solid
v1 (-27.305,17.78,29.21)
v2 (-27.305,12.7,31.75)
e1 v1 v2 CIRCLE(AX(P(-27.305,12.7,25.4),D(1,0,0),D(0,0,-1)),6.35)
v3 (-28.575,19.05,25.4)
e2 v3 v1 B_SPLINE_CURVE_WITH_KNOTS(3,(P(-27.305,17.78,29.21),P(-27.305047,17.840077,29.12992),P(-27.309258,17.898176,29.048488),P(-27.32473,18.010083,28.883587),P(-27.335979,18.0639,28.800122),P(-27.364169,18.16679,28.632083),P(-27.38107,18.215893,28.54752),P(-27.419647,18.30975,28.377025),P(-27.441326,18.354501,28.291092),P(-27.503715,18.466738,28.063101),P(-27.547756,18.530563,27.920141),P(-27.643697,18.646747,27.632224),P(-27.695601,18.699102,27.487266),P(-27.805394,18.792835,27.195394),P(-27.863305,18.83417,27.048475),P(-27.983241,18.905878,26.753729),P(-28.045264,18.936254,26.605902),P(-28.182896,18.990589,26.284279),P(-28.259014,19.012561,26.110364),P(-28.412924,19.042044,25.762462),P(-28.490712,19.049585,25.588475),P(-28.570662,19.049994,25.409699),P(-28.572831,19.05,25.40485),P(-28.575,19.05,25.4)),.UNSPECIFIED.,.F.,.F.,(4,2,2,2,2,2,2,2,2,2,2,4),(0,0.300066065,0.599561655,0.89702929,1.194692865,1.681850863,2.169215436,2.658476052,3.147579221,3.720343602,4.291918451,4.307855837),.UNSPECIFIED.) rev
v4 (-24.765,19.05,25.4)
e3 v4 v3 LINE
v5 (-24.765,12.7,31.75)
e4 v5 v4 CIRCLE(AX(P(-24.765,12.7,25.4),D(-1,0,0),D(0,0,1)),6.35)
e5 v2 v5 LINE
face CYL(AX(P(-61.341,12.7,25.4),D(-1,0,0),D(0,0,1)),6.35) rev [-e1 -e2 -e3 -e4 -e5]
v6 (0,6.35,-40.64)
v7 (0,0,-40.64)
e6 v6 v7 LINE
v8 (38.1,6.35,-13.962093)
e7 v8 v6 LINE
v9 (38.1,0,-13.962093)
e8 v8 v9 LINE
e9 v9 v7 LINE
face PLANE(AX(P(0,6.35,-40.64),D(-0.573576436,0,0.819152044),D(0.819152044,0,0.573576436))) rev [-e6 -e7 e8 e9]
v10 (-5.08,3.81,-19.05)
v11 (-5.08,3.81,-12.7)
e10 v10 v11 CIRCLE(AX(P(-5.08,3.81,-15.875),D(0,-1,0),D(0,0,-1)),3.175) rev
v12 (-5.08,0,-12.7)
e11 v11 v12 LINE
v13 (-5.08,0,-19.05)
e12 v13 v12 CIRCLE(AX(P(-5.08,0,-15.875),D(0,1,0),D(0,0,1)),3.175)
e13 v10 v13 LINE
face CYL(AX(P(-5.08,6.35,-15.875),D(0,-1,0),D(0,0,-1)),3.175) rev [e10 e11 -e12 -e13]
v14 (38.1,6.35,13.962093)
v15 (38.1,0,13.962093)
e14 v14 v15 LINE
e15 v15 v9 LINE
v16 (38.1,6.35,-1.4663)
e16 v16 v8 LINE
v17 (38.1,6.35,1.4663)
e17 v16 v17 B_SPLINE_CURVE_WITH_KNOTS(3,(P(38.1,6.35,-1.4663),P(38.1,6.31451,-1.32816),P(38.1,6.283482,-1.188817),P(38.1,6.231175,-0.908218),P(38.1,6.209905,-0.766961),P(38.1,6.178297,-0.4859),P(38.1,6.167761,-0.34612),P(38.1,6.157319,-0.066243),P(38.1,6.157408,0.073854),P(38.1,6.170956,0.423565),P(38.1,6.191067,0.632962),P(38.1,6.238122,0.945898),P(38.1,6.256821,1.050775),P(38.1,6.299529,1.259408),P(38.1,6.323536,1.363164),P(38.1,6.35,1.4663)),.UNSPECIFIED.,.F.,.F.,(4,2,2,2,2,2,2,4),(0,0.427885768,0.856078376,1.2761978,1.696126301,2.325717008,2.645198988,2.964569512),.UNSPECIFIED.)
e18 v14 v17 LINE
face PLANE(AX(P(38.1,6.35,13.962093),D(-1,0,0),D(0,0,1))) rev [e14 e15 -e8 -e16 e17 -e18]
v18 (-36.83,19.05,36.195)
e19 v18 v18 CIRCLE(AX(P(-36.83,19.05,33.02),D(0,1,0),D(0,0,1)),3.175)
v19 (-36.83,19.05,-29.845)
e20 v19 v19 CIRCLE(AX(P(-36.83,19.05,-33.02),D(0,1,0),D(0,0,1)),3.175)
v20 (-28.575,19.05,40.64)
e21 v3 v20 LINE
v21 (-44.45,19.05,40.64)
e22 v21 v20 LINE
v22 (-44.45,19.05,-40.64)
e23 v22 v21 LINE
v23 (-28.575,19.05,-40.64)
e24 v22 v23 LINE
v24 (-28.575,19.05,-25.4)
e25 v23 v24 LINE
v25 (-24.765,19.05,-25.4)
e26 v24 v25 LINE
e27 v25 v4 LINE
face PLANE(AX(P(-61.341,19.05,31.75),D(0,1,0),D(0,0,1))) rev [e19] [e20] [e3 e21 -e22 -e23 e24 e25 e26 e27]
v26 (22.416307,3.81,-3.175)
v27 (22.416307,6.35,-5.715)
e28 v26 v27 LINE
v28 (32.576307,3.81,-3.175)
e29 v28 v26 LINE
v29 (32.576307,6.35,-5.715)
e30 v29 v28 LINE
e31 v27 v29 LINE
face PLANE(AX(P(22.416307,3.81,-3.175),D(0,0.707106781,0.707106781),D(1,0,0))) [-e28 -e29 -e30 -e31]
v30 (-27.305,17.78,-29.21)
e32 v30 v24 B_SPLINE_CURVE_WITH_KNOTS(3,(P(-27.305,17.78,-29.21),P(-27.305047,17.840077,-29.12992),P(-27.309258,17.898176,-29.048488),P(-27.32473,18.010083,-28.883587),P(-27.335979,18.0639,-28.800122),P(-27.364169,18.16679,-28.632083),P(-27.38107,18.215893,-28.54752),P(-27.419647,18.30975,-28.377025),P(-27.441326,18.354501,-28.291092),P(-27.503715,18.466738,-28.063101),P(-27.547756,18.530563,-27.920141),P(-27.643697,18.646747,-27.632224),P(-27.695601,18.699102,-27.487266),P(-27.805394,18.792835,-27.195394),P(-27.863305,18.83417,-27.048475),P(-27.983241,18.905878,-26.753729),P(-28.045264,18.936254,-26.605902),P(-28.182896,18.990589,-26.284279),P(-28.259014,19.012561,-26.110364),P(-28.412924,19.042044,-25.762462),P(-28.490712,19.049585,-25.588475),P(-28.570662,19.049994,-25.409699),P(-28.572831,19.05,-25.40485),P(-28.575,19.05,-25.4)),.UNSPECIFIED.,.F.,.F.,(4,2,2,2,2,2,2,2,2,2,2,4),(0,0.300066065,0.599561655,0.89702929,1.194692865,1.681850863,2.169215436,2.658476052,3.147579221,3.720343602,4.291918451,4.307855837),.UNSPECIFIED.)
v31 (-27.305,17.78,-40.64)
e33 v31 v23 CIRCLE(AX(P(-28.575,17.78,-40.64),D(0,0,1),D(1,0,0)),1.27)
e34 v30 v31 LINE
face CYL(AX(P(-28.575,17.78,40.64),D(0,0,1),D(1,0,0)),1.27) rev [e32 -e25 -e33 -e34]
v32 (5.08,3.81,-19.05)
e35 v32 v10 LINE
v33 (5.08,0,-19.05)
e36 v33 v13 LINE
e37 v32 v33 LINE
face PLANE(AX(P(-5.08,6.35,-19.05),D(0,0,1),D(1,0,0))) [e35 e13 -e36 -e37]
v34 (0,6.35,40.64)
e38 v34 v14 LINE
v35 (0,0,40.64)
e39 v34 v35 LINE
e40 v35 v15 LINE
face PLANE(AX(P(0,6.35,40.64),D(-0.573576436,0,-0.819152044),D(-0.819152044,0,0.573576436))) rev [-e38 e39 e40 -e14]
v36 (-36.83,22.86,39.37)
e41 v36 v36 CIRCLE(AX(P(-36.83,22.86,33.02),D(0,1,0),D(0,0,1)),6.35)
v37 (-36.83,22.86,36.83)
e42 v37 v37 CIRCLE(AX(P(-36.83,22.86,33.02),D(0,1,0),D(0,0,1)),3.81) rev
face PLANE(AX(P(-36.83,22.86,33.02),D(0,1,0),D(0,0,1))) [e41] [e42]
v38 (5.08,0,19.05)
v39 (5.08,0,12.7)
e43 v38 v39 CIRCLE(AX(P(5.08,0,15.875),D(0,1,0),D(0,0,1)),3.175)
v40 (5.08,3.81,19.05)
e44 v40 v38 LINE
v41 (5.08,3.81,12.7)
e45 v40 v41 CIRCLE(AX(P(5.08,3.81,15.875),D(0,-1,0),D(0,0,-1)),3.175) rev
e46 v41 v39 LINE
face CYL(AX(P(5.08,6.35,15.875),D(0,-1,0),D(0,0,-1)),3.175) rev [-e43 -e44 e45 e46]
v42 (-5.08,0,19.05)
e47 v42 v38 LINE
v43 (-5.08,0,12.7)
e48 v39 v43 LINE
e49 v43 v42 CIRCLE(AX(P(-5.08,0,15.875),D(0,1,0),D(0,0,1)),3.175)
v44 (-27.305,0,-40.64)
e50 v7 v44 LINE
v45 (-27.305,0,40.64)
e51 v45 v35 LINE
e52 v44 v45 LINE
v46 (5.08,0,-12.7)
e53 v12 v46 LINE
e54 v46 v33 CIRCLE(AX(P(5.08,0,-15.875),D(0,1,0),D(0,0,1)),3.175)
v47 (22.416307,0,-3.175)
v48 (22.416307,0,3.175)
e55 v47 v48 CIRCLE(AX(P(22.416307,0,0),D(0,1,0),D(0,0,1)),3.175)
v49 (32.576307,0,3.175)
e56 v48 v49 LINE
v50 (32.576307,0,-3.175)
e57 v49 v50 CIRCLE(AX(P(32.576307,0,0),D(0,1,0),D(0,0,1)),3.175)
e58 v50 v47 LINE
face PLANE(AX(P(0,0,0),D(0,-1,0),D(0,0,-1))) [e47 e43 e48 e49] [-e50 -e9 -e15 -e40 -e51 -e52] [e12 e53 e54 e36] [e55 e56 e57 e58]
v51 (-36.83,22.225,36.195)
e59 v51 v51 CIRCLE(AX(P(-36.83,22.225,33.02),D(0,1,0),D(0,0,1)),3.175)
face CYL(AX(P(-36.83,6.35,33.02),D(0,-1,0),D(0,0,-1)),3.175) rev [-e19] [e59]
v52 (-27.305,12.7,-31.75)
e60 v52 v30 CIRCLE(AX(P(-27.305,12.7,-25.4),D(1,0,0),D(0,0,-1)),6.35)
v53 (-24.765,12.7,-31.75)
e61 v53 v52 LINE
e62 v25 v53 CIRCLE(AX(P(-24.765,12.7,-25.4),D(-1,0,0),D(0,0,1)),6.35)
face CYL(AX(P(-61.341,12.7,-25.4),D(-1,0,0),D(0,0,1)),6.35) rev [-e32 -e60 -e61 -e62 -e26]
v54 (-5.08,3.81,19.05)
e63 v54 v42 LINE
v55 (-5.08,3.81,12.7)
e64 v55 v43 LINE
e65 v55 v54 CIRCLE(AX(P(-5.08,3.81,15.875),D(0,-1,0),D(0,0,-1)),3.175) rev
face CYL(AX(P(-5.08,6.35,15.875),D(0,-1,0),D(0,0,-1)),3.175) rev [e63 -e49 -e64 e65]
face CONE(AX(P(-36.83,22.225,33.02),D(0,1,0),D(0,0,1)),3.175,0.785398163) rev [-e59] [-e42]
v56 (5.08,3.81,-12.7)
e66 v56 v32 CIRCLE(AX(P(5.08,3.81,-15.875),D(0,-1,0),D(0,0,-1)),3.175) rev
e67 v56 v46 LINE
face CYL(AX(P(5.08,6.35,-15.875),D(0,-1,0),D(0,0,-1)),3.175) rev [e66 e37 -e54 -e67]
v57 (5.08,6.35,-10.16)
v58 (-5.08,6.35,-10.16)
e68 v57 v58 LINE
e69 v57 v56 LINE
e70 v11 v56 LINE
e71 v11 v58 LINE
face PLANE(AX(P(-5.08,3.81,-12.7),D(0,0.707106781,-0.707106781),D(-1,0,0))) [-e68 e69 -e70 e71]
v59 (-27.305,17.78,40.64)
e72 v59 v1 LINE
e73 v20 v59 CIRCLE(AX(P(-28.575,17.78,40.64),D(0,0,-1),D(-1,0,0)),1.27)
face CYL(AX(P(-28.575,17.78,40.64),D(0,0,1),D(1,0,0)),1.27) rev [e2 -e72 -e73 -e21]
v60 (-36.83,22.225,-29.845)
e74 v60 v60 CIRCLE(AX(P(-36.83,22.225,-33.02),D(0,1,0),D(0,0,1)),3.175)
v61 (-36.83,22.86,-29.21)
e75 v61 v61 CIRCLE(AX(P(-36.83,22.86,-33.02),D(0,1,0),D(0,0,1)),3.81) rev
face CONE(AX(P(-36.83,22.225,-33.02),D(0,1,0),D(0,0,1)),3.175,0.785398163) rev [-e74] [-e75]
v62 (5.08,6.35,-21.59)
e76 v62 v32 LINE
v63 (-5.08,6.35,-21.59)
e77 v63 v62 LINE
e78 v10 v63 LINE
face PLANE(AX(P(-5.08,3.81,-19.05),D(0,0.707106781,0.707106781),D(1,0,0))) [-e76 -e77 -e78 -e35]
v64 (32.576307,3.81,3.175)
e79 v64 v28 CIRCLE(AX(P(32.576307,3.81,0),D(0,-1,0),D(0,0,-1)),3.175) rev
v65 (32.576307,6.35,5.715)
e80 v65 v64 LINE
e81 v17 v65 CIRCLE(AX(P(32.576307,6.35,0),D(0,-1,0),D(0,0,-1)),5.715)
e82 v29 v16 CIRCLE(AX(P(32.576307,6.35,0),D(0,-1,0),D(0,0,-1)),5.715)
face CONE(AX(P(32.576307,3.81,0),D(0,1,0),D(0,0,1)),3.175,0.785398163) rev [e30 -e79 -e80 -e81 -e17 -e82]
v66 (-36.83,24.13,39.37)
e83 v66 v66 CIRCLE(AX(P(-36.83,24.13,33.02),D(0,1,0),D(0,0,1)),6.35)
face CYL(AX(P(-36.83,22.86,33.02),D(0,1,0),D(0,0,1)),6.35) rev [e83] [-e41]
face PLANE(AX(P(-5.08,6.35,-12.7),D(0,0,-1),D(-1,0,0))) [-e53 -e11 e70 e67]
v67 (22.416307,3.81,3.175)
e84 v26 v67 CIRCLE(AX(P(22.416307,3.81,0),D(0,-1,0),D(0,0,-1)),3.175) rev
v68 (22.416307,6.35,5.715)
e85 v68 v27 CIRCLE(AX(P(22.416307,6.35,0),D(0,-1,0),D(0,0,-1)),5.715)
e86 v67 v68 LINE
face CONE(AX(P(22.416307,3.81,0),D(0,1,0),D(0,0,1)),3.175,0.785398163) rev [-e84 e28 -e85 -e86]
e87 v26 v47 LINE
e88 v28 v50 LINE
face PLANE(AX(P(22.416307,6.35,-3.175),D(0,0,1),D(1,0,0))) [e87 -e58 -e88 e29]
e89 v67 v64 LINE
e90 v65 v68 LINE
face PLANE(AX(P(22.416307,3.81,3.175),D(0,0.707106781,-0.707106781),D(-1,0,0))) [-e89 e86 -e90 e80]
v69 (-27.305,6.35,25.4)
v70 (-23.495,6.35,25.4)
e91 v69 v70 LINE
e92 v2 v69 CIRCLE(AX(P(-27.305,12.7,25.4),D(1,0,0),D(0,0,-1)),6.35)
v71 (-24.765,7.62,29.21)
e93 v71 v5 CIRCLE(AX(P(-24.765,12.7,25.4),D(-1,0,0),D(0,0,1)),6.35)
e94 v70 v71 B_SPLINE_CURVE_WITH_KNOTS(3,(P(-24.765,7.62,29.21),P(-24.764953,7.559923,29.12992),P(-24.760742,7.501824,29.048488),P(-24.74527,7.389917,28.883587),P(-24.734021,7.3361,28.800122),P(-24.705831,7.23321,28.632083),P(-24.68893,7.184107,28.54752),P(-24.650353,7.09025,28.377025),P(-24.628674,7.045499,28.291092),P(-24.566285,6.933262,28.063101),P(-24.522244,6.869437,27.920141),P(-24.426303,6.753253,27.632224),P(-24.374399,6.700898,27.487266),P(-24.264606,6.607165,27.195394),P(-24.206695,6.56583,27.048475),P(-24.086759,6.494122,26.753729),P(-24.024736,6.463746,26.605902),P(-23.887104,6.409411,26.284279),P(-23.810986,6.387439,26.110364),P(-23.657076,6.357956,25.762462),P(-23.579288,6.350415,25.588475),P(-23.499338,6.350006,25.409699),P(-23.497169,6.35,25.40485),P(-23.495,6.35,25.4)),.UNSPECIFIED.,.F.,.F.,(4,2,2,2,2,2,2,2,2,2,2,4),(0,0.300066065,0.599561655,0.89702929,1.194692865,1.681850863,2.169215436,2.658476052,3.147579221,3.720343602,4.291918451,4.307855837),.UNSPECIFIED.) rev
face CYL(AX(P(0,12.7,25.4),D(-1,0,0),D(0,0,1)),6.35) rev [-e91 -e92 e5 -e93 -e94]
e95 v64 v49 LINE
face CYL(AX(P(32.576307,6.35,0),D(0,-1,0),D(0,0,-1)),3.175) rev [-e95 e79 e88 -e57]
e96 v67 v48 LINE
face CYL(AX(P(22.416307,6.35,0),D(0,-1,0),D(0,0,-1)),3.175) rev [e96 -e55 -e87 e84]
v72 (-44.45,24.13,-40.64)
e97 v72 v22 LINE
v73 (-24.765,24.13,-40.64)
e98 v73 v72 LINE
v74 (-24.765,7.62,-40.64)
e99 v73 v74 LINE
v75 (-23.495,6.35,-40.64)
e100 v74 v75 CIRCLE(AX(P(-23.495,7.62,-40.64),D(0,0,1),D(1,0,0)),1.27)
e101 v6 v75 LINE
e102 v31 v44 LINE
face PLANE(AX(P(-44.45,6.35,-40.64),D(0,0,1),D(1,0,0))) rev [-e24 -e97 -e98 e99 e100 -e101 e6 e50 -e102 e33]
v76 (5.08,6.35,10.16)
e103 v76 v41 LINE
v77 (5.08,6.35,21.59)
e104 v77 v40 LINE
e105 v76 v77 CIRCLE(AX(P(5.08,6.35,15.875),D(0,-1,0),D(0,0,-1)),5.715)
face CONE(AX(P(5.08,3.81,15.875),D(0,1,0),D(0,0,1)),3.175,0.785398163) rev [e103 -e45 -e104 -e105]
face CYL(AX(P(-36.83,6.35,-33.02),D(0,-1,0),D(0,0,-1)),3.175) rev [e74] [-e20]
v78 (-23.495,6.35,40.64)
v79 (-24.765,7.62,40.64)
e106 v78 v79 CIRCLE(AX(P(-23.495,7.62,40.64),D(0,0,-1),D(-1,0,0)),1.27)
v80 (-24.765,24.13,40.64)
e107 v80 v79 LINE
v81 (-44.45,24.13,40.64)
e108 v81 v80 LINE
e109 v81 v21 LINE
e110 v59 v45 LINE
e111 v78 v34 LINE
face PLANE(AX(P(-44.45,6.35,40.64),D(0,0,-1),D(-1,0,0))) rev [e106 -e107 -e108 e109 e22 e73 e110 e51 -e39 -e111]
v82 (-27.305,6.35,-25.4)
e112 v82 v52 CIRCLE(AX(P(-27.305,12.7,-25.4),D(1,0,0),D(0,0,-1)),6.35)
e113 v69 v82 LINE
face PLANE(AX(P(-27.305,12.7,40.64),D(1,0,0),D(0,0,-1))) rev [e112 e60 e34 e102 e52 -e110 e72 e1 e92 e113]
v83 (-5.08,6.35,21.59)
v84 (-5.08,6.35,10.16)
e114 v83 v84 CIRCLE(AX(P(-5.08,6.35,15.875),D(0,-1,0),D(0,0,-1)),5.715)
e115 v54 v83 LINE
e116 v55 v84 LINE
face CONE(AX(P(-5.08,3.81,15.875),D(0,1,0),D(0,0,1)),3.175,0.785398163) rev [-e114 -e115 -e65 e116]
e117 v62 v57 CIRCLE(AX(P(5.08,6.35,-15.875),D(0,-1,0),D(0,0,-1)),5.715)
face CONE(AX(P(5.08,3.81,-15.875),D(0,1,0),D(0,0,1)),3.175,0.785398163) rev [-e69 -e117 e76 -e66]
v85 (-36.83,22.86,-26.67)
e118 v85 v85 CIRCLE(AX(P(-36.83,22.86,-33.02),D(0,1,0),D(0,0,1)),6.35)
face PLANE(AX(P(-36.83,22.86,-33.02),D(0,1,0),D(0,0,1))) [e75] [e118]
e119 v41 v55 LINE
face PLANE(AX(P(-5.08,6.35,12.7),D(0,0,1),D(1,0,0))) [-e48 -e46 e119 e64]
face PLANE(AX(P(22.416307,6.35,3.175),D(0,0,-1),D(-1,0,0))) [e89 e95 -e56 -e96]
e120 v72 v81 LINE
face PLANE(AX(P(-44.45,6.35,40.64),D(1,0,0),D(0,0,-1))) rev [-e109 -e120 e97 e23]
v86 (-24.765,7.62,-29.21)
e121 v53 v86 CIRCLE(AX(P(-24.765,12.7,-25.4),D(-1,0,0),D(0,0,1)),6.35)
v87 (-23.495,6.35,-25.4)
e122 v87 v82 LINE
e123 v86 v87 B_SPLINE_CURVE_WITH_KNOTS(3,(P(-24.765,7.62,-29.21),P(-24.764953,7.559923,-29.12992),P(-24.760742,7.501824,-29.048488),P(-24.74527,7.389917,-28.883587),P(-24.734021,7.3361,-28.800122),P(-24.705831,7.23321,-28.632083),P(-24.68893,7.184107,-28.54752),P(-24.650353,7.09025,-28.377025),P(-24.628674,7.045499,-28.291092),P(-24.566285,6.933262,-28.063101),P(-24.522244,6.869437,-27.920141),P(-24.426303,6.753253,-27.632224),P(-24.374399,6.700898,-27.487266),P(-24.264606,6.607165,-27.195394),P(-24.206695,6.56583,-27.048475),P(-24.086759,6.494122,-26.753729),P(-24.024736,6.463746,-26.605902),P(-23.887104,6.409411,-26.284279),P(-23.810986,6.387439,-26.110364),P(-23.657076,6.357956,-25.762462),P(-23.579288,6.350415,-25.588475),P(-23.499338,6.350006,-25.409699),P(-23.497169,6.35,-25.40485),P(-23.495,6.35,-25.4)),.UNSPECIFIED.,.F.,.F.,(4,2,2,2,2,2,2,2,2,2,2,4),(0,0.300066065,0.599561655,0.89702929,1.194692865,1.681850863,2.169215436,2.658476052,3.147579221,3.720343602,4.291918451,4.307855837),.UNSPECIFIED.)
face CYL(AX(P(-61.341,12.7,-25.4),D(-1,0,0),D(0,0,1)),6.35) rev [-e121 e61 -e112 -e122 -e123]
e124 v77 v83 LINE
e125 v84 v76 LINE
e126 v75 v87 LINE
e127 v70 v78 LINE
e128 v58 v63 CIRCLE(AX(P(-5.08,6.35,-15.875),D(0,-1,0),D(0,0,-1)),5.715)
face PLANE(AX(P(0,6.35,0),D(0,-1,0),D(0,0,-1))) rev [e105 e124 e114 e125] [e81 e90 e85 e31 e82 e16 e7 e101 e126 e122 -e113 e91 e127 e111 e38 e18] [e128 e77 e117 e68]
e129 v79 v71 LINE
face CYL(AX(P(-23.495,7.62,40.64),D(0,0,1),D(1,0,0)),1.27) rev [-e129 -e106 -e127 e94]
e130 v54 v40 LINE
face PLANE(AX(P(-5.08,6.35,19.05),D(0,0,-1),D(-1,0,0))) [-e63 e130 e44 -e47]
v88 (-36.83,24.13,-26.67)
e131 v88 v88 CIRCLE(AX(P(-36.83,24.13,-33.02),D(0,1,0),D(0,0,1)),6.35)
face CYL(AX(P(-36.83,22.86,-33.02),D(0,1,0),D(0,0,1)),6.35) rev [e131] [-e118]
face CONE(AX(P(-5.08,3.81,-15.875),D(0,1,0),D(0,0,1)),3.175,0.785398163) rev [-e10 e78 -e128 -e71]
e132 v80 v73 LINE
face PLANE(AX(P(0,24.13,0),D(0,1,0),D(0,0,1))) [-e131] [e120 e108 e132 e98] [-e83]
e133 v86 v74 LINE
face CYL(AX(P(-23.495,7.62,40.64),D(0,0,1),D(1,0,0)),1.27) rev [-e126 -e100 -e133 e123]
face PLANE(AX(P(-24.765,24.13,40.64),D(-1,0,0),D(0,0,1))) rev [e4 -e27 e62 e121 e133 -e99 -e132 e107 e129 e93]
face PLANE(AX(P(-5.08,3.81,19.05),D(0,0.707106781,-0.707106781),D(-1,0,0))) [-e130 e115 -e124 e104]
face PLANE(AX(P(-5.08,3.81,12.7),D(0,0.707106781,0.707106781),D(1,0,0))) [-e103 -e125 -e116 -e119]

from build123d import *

# Parameters (mm, degrees)
SKETCH1_R           = 3.175
BOSS_EXTRUDE1_DEPTH = 6.35
SKETCH10_W          = 19.685
SKETCH10_H          = 81.28
SKETCH10_R          = 3.175
BOSS_EXTRUDE4_DEPTH = 17.78
SKETCH12_W          = 17.145
SKETCH12_H          = 81.28
CUT_EXTRUDE5_DEPTH  = 12.7
SKETCH14_R          = 6.35
CUT_EXTRUDE9_DEPTH  = 1.27
CHAMFER2_SIZE       = 0.635
SKETCH15_W          = 63.5
SKETCH15_H          = 12.7
CUT_EXTRUDE10_DEPTH = 36.576
SKETCH16_W          = 17.145
SKETCH16_H          = 6.35
CUT_EXTRUDE11_DEPTH = 84.836
FILLET1_R           = 1.27
FILLET2_START       = -31.75
FILLET2_DEPTH       = 6.3500001
FILLET2_START_2     = 25.3999999
FILLET2_2_DEPTH     = 6.3500001
FILLET2_START_3     = -30
FILLET2_3_DEPTH     = 6.505


with BuildPart() as part:
    # Sketch1 → Boss-Extrude1 (new body)
    with BuildSketch(Plane(origin=(0, 0, 0), x_dir=(1, 0, 0), z_dir=(0, 1, 0))):
        Polygon((0, 40.64), (38.1, 13.962092794), (38.1, -13.962092794), (0, -40.64), (-44.45, -40.64), (-44.45, 40.64), align=None)
        with Locations(Location((-36.83, 33.02, 0), (0, 0, 270))):
            Circle(SKETCH1_R, mode=Mode.SUBTRACT)
        with Locations(Location((-36.83, -33.02, 0), (0, 0, 270))):
            Circle(SKETCH1_R, mode=Mode.SUBTRACT)
        with BuildLine():
            Line((-5.08, 19.05), (5.08, 19.05))
            ThreePointArc((5.08, 19.05), (8.255, 15.875), (5.08, 12.7))
            Line((5.08, 12.7), (-5.08, 12.7))
            ThreePointArc((-5.08, 12.7), (-8.255, 15.875), (-5.08, 19.05))
        make_face(mode=Mode.SUBTRACT)
        with BuildLine():
            Line((-5.08, -12.7), (5.08, -12.7))
            ThreePointArc((5.08, -12.7), (8.255, -15.875), (5.08, -19.05))
            Line((5.08, -19.05), (-5.08, -19.05))
            ThreePointArc((-5.08, -19.05), (-8.255, -15.875), (-5.08, -12.7))
        make_face(mode=Mode.SUBTRACT)
        with BuildLine():
            Line((22.41630657, 3.175), (32.57630657, 3.175))
            ThreePointArc((32.57630657, 3.175), (35.75130657, 0), (32.57630657, -3.175))
            Line((32.57630657, -3.175), (22.41630657, -3.175))
            ThreePointArc((22.41630657, -3.175), (19.24130657, 0), (22.41630657, 3.175))
        make_face(mode=Mode.SUBTRACT)
    extrude(amount=BOSS_EXTRUDE1_DEPTH)

    # Sketch10 → Boss-Extrude4 (add)
    with BuildSketch(Plane(origin=(0, 6.35, 0), x_dir=(1, 0, 0), z_dir=(0, 1, 0))):
        with Locations((-34.6075, 0)):
            Rectangle(SKETCH10_W, SKETCH10_H)
        with Locations(Location((-36.83, -33.02, 0), (0, 0, 270))):
            Circle(SKETCH10_R, mode=Mode.SUBTRACT)
        with Locations(Location((-36.83, 33.02, 0), (0, 0, 270))):
            Circle(SKETCH10_R, mode=Mode.SUBTRACT)
    extrude(amount=BOSS_EXTRUDE4_DEPTH)

    # Sketch12 → Cut-Extrude5 (cut)
    with BuildSketch(Plane.XZ):
        with Locations((-35.8775, 0)):
            Rectangle(SKETCH12_W, SKETCH12_H)
    extrude(amount=-CUT_EXTRUDE5_DEPTH, mode=Mode.SUBTRACT)

    # Sketch14 → Cut-Extrude9 (cut)
    with BuildSketch(Plane(origin=(0, 24.13, 0), x_dir=(1, 0, 0), z_dir=(0, 1, 0))):
        with Locations(Location((-36.83, 33.02, 0), (0, 0, 270))):
            Circle(SKETCH14_R)
        with Locations(Location((-36.83, -33.02, 0), (0, 0, 270))):
            Circle(SKETCH14_R)
    extrude(amount=-CUT_EXTRUDE9_DEPTH, mode=Mode.SUBTRACT)

    # Chamfer2
    chamfer2_edges = [part.edges().sort_by_distance(p)[0] for p in [
        (-36.83, 22.86, -36.195),
        (-36.83, 22.86, 29.845),
    ]]
    chamfer(chamfer2_edges, length=CHAMFER2_SIZE)

    # Sketch15 → Cut-Extrude10 (cut)
    with BuildSketch(Plane(origin=(-24.765, 0, 0), x_dir=(0, 0, -1), z_dir=(1, 0, 0))):
        with Locations((0, 12.7)):
            Rectangle(SKETCH15_W, SKETCH15_H)
    extrude(amount=-CUT_EXTRUDE10_DEPTH, mode=Mode.SUBTRACT)

    # Sketch16 → Cut-Extrude11 (cut)
    with BuildSketch(Plane(origin=(0, 0, -40.64), x_dir=(-1, 0, 0), z_dir=(0, 0, -1))):
        with Locations((35.8775, 15.875)):
            Rectangle(SKETCH16_W, SKETCH16_H)
    extrude(amount=-CUT_EXTRUDE11_DEPTH, mode=Mode.SUBTRACT)

    # Fillet1
    fillet1_edges = [part.edges().sort_by_distance(p)[0] for p in [
        (-24.765, 6.35, -36.195),
        (-27.305, 19.05, 36.195),
        (-27.305, 19.05, -36.195),
        (-24.765, 6.35, 36.195),
    ]]
    fillet(fillet1_edges, radius=FILLET1_R)

    # Fillet2: read off the stored shape, not the designer's step
    # Fillet2 outline → Fillet2 (add)
    with BuildSketch(Plane.XY.offset(FILLET2_START)):
        with BuildLine():
            ThreePointArc((-23.495, 6.35), (-24.393025612, 6.721974388), (-24.765, 7.62))
            Line((-24.765, 7.62), (-24.765, 19.05))
            Line((-24.765, 19.05), (-28.575, 19.05))
            ThreePointArc((-28.575, 19.05), (-27.676974388, 18.678025612), (-27.305, 17.78))
            Line((-27.305, 17.78), (-27.305, 6.35))
            Line((-27.305, 6.35), (-23.495, 6.35))
        make_face()
    extrude(amount=FILLET2_DEPTH)

    # Fillet2 2 outline → Fillet2 2 (add)
    with BuildSketch(Plane.XY.offset(FILLET2_START_2)):
        with BuildLine():
            ThreePointArc((-23.495, 6.35), (-24.393025612, 6.721974388), (-24.765, 7.62))
            Line((-24.765, 7.62), (-24.765, 19.05))
            Line((-24.765, 19.05), (-28.575, 19.05))
            ThreePointArc((-28.575, 19.05), (-27.676974388, 18.678025612), (-27.305, 17.78))
            Line((-27.305, 17.78), (-27.305, 6.35))
            Line((-27.305, 6.35), (-23.495, 6.35))
        make_face()
    extrude(amount=FILLET2_2_DEPTH)

    # Fillet2 3 outline → Fillet2 3 (cut)
    with BuildSketch(Plane.YZ.offset(FILLET2_START_3)):
        with BuildLine():
            ThreePointArc((19.05, 25.4), (17.190128061, 29.890128061), (12.7, 31.75))
            ThreePointArc((12.7, 31.75), (8.209871939, 29.890128061), (6.35, 25.4))
            Line((6.35, 25.4), (19.05, 25.4))
        make_face()
        with BuildLine():
            ThreePointArc((12.7, -31.75), (17.190128061, -29.890128061), (19.05, -25.4))
            Line((19.05, -25.4), (6.35, -25.4))
            ThreePointArc((6.35, -25.4), (8.209871939, -29.890128061), (12.7, -31.75))
        make_face()
    extrude(amount=FILLET2_3_DEPTH, mode=Mode.SUBTRACT)

    # Chamfer3: read off the stored shape, not the designer's step
    # Chamfer3: loft between two sections, ruled curve by curve
    chamfer3_from = [
        Edge.make_three_point_arc((-5.08, 3.81, 12.7), (-7.32506403, 3.81, 13.62993597), (-8.255, 3.81, 15.875)),
        Edge.make_three_point_arc((-8.255, 3.81, 15.875), (-7.32506403, 3.81, 18.12006403), (-5.08, 3.81, 19.05)),
        Edge.make_three_point_arc((5.08, 3.81, 19.05), (7.32506403, 3.81, 18.12006403), (8.255, 3.81, 15.875)),
        Edge.make_three_point_arc((8.255, 3.81, 15.875), (7.32506403, 3.81, 13.62993597), (5.08, 3.81, 12.7)),
        Edge.make_line((5.08, 3.81, 12.7), (-5.08, 3.81, 12.7)),
        Edge.make_line((-5.08, 3.81, 19.05), (5.08, 3.81, 19.05)),
    ]
    chamfer3_to = [
        Edge.make_three_point_arc((-5.08, 6.35, 10.16), (-9.121115254, 6.35, 11.833884746), (-10.795, 6.35, 15.875)),
        Edge.make_three_point_arc((-10.795, 6.35, 15.875), (-9.121115254, 6.35, 19.916115254), (-5.08, 6.35, 21.59)),
        Edge.make_three_point_arc((5.08, 6.35, 21.59), (9.121115254, 6.35, 19.916115254), (10.795, 6.35, 15.875)),
        Edge.make_three_point_arc((10.795, 6.35, 15.875), (9.121115254, 6.35, 11.833884746), (5.08, 6.35, 10.16)),
        Edge.make_line((5.08, 6.35, 10.16), (-5.08, 6.35, 10.16)),
        Edge.make_line((-5.08, 6.35, 21.59), (5.08, 6.35, 21.59)),
    ]
    chamfer3 = Solid(Shell([*[Face.make_surface_from_curves(chamfer3_from[k], chamfer3_to[k]) for k in range(6)], Face(Wire(chamfer3_from)), Face(Wire(chamfer3_to))]))
    add(chamfer3, mode=Mode.SUBTRACT)

    # Chamfer3 2: loft between two sections, ruled curve by curve
    chamfer3_2_from = [
        Edge.make_three_point_arc((22.41630657, 3.81, -3.175), (20.17124254, 3.81, -2.24506403), (19.24130657, 3.81, 0)),
        Edge.make_three_point_arc((19.24130657, 3.81, 0), (20.17124254, 3.81, 2.24506403), (22.41630657, 3.81, 3.175)),
        Edge.make_three_point_arc((32.57630657, 3.81, 3.175), (34.8213706, 3.81, 2.24506403), (35.75130657, 3.81, 0)),
        Edge.make_three_point_arc((35.75130657, 3.81, 0), (34.8213706, 3.81, -2.24506403), (32.57630657, 3.81, -3.175)),
        Edge.make_line((32.57630657, 3.81, -3.175), (22.41630657, 3.81, -3.175)),
        Edge.make_line((22.41630657, 3.81, 3.175), (32.57630657, 3.81, 3.175)),
    ]
    chamfer3_2_to = [
        Edge.make_three_point_arc((22.41630657, 6.35, -5.715), (18.375191316, 6.35, -4.041115254), (16.70130657, 6.35, 0)),
        Edge.make_three_point_arc((16.70130657, 6.35, 0), (18.375191316, 6.35, 4.041115254), (22.41630657, 6.35, 5.715)),
        Edge.make_three_point_arc((32.57630657, 6.35, 5.715), (36.617421825, 6.35, 4.041115254), (38.29130657, 6.35, 0)),
        Edge.make_three_point_arc((38.29130657, 6.35, 0), (36.617421825, 6.35, -4.041115254), (32.57630657, 6.35, -5.715)),
        Edge.make_line((32.57630657, 6.35, -5.715), (22.41630657, 6.35, -5.715)),
        Edge.make_line((22.41630657, 6.35, 5.715), (32.57630657, 6.35, 5.715)),
    ]
    chamfer3_2 = Solid(Shell([*[Face.make_surface_from_curves(chamfer3_2_from[k], chamfer3_2_to[k]) for k in range(6)], Face(Wire(chamfer3_2_from)), Face(Wire(chamfer3_2_to))]))
    add(chamfer3_2, mode=Mode.SUBTRACT)

    # Chamfer3 3: loft between two sections, ruled curve by curve
    chamfer3_3_from = [
        Edge.make_three_point_arc((-5.08, 3.81, -19.05), (-7.32506403, 3.81, -18.12006403), (-8.255, 3.81, -15.875)),
        Edge.make_three_point_arc((-8.255, 3.81, -15.875), (-7.32506403, 3.81, -13.62993597), (-5.08, 3.81, -12.7)),
        Edge.make_three_point_arc((5.08, 3.81, -12.7), (7.32506403, 3.81, -13.62993597), (8.255, 3.81, -15.875)),
        Edge.make_three_point_arc((8.255, 3.81, -15.875), (7.32506403, 3.81, -18.12006403), (5.08, 3.81, -19.05)),
        Edge.make_line((5.08, 3.81, -19.05), (-5.08, 3.81, -19.05)),
        Edge.make_line((-5.08, 3.81, -12.7), (5.08, 3.81, -12.7)),
    ]
    chamfer3_3_to = [
        Edge.make_three_point_arc((-5.08, 6.35, -21.59), (-9.121115254, 6.35, -19.916115254), (-10.795, 6.35, -15.875)),
        Edge.make_three_point_arc((-10.795, 6.35, -15.875), (-9.121115254, 6.35, -11.833884746), (-5.08, 6.35, -10.16)),
        Edge.make_three_point_arc((5.08, 6.35, -10.16), (9.121115254, 6.35, -11.833884746), (10.795, 6.35, -15.875)),
        Edge.make_three_point_arc((10.795, 6.35, -15.875), (9.121115254, 6.35, -19.916115254), (5.08, 6.35, -21.59)),
        Edge.make_line((5.08, 6.35, -21.59), (-5.08, 6.35, -21.59)),
        Edge.make_line((-5.08, 6.35, -10.16), (5.08, 6.35, -10.16)),
    ]
    chamfer3_3 = Solid(Shell([*[Face.make_surface_from_curves(chamfer3_3_from[k], chamfer3_3_to[k]) for k in range(6)], Face(Wire(chamfer3_3_from)), Face(Wire(chamfer3_3_to))]))
    add(chamfer3_3, mode=Mode.SUBTRACT)


solid = part.part
